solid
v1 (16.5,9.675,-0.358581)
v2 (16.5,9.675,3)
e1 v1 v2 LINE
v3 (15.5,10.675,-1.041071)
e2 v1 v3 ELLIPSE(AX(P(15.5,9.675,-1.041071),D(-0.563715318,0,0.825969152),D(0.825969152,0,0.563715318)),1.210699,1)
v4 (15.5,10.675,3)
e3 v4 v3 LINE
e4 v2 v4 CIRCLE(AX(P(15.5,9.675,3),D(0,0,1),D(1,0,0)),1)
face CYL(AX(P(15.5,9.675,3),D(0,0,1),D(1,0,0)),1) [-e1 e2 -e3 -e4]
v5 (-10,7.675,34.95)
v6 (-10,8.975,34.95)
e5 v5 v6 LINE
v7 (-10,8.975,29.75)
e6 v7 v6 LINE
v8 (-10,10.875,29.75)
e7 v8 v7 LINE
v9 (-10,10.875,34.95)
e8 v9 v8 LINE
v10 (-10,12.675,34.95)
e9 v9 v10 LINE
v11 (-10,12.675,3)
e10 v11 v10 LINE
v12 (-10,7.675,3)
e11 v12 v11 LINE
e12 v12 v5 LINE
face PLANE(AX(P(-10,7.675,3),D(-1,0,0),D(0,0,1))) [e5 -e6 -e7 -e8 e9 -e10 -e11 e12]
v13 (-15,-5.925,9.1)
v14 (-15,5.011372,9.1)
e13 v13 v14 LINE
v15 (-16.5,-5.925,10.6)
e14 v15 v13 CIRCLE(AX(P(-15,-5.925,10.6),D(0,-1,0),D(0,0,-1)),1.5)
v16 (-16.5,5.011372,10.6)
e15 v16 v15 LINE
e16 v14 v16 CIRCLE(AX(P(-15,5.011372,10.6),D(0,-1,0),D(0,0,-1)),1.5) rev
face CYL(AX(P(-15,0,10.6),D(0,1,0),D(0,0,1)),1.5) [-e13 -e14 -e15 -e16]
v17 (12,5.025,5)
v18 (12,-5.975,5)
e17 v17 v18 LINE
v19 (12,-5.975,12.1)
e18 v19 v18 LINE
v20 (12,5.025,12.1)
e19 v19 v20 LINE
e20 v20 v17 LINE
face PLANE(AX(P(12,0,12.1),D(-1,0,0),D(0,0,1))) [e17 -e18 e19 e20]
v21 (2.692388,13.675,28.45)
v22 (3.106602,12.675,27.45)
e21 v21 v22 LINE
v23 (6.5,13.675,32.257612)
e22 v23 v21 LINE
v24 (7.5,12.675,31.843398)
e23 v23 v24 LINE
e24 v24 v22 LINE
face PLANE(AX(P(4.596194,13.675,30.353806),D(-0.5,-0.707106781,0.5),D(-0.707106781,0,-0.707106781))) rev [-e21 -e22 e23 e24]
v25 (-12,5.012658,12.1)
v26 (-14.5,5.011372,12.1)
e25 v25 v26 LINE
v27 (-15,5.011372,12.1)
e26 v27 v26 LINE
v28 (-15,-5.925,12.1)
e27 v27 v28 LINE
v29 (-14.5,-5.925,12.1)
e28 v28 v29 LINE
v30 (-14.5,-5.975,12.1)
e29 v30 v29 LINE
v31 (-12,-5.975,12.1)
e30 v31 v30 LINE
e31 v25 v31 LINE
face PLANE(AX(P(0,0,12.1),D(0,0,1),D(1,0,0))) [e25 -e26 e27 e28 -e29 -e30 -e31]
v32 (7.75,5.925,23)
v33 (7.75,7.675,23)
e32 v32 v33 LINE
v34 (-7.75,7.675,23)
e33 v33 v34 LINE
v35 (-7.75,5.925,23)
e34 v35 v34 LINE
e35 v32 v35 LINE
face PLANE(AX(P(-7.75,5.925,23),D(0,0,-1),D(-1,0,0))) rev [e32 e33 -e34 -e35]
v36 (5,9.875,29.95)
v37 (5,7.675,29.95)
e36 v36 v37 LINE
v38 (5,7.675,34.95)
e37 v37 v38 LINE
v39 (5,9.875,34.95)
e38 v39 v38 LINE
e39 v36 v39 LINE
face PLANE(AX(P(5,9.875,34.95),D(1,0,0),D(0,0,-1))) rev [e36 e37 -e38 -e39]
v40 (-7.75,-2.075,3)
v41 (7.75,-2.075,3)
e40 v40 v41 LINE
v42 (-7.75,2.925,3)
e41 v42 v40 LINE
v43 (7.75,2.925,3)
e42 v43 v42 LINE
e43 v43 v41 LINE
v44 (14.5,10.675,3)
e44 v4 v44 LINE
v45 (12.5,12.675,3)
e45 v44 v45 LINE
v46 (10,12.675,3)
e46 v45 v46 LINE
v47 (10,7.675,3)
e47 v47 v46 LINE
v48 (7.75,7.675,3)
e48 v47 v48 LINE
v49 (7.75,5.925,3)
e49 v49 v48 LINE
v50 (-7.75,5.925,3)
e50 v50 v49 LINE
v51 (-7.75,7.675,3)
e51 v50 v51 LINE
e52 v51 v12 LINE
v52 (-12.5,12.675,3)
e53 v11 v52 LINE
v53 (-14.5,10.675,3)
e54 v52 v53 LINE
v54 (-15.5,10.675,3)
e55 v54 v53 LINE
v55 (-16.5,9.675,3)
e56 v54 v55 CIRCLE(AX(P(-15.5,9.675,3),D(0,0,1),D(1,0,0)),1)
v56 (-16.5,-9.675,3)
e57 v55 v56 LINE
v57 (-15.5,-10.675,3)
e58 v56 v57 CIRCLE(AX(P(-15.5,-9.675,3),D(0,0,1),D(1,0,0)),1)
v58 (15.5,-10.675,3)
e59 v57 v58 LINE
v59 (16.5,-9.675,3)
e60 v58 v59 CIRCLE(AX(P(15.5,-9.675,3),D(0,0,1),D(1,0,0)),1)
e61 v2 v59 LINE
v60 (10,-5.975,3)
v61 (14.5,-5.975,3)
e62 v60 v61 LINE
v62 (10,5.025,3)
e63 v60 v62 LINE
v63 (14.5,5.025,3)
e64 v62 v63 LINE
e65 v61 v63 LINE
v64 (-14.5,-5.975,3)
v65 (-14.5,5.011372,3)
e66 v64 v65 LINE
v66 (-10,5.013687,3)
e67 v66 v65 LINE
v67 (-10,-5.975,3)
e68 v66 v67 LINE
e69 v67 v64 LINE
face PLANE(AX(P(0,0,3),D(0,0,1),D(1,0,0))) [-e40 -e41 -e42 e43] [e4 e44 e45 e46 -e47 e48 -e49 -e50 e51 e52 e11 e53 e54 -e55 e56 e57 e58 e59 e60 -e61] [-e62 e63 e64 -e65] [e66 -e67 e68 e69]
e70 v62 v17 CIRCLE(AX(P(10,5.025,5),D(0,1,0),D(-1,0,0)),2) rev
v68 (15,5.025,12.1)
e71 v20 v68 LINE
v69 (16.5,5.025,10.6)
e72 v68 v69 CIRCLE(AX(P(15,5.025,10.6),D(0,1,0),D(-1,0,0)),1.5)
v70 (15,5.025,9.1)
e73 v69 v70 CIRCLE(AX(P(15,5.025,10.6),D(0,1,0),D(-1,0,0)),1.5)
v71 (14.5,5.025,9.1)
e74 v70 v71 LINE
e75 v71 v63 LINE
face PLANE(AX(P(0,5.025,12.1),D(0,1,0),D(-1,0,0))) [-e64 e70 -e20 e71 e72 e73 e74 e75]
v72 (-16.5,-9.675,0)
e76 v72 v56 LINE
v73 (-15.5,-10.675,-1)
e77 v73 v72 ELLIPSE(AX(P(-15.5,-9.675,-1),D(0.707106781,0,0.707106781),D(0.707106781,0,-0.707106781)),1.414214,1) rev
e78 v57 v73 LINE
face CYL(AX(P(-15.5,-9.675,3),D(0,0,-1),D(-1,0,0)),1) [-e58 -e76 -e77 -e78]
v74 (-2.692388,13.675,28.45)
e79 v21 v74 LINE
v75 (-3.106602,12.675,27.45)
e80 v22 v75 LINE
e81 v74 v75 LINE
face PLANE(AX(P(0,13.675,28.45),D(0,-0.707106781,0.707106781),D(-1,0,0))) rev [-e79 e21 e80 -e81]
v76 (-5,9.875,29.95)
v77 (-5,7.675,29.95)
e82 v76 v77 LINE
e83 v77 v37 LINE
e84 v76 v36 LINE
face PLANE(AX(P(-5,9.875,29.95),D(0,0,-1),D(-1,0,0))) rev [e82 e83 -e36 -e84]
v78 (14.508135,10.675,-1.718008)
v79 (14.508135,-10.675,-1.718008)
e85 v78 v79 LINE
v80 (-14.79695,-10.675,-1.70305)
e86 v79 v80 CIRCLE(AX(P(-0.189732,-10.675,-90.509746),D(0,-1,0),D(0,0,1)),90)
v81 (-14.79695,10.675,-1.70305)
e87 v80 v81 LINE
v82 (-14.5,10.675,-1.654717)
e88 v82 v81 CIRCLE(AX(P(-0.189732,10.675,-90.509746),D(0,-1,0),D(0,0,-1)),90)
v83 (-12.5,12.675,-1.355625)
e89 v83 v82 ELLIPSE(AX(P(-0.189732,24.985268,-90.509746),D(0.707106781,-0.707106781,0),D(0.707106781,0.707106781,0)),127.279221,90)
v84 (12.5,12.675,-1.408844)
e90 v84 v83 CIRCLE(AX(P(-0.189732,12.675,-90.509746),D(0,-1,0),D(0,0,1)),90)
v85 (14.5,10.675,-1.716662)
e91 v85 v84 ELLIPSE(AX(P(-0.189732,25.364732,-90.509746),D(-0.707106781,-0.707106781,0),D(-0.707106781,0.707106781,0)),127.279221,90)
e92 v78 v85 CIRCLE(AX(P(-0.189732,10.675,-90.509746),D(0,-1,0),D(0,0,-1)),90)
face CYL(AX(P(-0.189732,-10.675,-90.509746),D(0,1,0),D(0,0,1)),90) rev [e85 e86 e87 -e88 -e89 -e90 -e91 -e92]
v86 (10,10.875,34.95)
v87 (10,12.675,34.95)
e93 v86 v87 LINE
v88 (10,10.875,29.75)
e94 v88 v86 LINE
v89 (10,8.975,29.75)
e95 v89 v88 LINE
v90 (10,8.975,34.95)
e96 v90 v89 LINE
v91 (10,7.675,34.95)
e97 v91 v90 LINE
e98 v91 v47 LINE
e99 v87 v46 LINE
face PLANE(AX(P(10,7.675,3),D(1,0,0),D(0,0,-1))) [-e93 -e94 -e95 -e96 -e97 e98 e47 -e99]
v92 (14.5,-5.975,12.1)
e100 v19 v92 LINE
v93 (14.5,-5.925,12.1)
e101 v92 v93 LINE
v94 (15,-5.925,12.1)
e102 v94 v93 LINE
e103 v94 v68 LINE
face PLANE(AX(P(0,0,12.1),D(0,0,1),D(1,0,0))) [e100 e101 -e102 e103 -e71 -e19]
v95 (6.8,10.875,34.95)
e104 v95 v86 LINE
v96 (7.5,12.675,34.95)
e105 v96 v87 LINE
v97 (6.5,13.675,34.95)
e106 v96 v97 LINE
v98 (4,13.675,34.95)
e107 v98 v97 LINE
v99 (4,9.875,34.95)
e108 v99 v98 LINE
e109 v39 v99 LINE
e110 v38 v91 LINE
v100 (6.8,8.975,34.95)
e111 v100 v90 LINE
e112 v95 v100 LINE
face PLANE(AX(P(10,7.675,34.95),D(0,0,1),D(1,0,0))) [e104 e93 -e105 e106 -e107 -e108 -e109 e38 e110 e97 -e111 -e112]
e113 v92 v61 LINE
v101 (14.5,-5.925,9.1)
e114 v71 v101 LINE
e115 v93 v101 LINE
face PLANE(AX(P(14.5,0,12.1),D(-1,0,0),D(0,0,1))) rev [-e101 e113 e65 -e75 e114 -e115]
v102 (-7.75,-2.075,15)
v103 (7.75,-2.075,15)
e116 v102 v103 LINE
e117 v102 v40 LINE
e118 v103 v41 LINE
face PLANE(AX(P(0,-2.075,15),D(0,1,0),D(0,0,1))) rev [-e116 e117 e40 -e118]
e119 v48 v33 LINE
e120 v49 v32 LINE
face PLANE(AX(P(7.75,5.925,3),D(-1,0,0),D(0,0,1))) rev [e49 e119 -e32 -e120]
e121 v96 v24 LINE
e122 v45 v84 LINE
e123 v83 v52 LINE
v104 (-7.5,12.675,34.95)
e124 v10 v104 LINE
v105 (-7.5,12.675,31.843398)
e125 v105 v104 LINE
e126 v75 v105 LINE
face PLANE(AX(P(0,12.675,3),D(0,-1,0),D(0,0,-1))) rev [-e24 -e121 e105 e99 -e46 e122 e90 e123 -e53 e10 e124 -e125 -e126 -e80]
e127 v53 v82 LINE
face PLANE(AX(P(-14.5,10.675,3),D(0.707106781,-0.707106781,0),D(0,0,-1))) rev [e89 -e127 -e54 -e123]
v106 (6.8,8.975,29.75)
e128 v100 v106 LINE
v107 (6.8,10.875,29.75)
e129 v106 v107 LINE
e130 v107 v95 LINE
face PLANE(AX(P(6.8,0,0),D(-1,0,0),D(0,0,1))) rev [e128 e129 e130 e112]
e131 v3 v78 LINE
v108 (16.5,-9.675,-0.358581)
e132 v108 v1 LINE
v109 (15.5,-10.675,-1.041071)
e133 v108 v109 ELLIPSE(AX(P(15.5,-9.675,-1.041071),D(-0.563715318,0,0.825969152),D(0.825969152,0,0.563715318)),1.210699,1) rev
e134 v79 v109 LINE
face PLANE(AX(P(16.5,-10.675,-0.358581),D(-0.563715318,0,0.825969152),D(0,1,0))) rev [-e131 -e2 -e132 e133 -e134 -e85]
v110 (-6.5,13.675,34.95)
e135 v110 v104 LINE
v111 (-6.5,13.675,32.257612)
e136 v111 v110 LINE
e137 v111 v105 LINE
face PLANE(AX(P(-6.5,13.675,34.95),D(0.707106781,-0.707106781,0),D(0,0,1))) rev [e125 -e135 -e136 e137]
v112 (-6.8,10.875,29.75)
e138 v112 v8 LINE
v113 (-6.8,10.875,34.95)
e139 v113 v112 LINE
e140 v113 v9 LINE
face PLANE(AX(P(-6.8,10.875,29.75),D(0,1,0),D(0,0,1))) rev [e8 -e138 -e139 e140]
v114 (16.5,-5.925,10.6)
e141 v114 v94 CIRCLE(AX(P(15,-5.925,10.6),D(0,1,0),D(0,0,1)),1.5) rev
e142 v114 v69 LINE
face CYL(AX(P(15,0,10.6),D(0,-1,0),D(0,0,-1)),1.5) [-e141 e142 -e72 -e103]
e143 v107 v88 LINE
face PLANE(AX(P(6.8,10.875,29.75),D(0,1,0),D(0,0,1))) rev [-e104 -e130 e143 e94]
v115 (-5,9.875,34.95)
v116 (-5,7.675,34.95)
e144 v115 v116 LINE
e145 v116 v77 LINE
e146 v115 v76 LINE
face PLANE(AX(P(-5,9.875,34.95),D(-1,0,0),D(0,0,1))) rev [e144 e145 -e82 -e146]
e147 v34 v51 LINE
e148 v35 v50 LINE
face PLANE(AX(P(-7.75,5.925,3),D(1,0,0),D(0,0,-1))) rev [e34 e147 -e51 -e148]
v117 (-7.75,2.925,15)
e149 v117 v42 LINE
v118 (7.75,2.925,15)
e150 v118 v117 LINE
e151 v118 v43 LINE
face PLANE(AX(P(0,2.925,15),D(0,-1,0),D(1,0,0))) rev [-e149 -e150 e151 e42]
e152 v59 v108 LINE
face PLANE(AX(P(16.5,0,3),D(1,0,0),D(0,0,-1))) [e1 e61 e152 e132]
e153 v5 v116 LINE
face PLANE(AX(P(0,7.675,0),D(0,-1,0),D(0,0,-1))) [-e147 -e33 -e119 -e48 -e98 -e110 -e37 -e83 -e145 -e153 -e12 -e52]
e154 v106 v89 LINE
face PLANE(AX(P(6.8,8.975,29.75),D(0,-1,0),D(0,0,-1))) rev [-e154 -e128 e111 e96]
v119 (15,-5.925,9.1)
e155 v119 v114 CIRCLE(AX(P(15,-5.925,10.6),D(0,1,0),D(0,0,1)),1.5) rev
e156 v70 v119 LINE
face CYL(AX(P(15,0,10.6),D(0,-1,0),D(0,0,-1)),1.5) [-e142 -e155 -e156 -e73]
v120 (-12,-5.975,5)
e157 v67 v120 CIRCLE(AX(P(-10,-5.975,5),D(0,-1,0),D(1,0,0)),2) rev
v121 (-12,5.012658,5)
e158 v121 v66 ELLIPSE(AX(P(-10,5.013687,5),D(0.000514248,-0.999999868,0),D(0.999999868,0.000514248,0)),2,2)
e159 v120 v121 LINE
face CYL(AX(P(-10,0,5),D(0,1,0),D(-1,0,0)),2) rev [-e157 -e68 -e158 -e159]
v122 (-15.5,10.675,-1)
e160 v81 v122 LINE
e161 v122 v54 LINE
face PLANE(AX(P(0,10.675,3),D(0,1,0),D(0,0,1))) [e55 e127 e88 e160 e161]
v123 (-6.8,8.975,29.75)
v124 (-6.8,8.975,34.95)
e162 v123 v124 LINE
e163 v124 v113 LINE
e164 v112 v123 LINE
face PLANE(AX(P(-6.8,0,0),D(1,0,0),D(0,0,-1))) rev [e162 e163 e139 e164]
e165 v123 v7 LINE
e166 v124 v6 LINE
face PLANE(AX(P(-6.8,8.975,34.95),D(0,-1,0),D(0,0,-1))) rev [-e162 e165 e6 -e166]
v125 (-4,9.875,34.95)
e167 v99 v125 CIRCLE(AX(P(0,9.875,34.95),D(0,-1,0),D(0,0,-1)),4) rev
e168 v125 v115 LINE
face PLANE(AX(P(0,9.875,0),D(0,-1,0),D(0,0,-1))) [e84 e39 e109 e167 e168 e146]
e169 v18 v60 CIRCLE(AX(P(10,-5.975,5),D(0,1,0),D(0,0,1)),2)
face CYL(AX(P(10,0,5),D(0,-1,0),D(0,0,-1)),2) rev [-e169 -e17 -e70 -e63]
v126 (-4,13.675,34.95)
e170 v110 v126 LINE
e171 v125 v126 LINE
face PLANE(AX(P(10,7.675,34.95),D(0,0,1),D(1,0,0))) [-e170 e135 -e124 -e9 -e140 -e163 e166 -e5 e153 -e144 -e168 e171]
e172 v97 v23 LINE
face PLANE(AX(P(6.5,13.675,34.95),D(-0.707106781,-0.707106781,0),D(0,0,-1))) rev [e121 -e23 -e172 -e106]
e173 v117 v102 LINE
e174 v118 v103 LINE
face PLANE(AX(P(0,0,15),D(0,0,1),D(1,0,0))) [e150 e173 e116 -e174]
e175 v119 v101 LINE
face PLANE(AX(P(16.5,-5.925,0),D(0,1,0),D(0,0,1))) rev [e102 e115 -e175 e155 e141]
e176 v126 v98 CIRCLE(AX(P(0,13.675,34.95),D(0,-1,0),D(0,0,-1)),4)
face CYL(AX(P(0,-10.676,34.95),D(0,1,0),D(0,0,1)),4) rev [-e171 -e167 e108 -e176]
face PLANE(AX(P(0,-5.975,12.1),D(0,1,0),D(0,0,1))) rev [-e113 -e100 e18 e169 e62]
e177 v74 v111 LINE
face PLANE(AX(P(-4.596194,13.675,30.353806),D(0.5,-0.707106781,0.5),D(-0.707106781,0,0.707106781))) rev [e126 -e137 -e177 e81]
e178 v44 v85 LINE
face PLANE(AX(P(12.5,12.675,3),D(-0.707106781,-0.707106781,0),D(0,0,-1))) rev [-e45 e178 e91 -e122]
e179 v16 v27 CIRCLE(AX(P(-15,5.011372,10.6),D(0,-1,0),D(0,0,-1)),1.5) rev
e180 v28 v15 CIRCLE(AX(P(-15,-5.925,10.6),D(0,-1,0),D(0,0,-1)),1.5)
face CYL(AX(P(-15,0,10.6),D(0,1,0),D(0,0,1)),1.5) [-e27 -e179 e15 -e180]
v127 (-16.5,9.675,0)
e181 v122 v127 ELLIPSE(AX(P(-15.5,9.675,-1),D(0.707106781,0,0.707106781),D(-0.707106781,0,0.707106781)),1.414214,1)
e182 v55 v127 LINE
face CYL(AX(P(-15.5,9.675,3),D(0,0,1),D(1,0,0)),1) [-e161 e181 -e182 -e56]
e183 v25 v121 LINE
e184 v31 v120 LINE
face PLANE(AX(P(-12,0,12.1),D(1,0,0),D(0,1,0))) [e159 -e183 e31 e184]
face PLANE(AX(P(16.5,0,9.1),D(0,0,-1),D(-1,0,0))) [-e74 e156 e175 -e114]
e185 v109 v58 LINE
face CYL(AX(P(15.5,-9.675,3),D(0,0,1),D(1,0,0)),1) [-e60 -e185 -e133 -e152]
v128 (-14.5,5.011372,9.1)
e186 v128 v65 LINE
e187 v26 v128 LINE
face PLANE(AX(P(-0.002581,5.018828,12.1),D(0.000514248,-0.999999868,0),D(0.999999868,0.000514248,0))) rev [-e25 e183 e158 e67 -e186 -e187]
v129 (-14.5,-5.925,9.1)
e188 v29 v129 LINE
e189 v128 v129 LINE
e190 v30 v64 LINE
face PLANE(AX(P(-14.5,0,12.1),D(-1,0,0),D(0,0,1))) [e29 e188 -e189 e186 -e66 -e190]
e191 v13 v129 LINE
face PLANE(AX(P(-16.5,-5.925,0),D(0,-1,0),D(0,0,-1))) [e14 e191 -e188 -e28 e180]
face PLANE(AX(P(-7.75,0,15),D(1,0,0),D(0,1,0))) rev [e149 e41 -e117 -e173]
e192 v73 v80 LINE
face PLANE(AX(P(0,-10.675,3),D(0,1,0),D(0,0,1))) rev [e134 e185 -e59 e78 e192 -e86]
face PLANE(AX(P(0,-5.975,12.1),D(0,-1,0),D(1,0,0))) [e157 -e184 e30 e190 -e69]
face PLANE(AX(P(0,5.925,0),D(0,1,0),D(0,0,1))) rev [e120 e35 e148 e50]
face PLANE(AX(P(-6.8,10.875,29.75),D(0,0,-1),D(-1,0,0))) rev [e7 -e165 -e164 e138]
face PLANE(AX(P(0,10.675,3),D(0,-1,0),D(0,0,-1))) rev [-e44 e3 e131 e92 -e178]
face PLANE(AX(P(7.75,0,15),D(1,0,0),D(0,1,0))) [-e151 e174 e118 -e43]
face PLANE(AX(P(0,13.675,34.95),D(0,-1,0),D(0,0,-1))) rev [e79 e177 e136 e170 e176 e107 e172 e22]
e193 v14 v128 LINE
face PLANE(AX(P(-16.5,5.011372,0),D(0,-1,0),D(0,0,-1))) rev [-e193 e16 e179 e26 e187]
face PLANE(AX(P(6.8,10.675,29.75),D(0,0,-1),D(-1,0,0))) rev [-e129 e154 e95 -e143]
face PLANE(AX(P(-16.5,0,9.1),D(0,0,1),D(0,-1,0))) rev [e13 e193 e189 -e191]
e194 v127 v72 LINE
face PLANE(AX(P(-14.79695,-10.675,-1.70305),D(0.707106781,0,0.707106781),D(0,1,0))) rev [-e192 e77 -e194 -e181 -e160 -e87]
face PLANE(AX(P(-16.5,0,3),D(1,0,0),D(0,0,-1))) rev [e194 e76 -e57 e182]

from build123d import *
from build123d.topology import SkipClean

# Parameters (mm, degrees)
BOSS_EXTRUDE1_DEPTH = 3
SKETCH2_W           = 2.5
SKETCH2_H           = 11
BOSS_EXTRUDE2_DEPTH = 9.1
SKETCH3_W           = 3
SKETCH3_H           = 10.936372413
BOSS_EXTRUDE3_DEPTH = 2
SKETCH4_W           = 3
SKETCH4_H           = 10.95
BOSS_EXTRUDE4_DEPTH = 2
FILLET2_R           = 1.5
FILLET3_R           = 2
SKETCH6_W           = 20
SKETCH6_H           = 31.95
BOSS_EXTRUDE5_DEPTH = 5
CUT_EXTRUDE1_REACH  = 47.155
BOSS_EXTRUDE6_START = 1
BOSS_EXTRUDE6_DEPTH = 1
CHAMFER1_SIZE       = 1
SKETCH10_W          = 15.5
SKETCH10_H          = 20
BOSS_EXTRUDE7_DEPTH = 1.75
BOSS_EXTRUDE8_DEPTH = 12
BOSS_EXTRUDE9_DEPTH = 23.35
CHAMFER3_SIZE       = 1.7121869
CHAMFER3_SIZE_2     = 2
FILLET4_R           = 1
CHAMFER4_SIZE       = 2
CUT_EXTRUDE2_DEPTH  = 41.997050199
CUT_EXTRUDE3_DEPTH  = 3.2
SKETCH15_W          = 5.2
SKETCH15_H          = 1.9
CUT_EXTRUDE4_DEPTH  = 3.2
SKETCH16_W          = 10
SKETCH16_H          = 5
CUT_EXTRUDE5_DEPTH  = 2.2


# Some blends are built 0.0001 mm under size
with BuildPart() as part:
    # Sketch1 → Boss-Extrude1 (new body)
    with BuildSketch(Plane.XY):
        Polygon((14.5, 12.675), (-14.5, 12.675), (-14.5, 10.675), (-16.5, 10.675), (-16.5, -10.675), (16.5, -10.675), (16.5, 10.675), (14.5, 10.675), align=None)
    extrude(amount=BOSS_EXTRUDE1_DEPTH)

    # Sketch2 → Boss-Extrude2 (add)
    with BuildSketch(Plane.XY.offset(3)):
        with Locations((13.25, -0.475)):
            Rectangle(SKETCH2_W, SKETCH2_H)
        Polygon((-14.5, 5.011372413), (-14.5, -5.975), (-12, -5.975), (-12, 5.012658035), align=None)
    extrude(amount=BOSS_EXTRUDE2_DEPTH)

    # Sketch3 → Boss-Extrude3 (add)
    with BuildSketch(Plane.ZY.offset(14.5)):
        with Locations((10.6, -0.456813794)):
            Rectangle(SKETCH3_W, SKETCH3_H)
    extrude(amount=BOSS_EXTRUDE3_DEPTH)

    # Sketch4 → Boss-Extrude4 (add)
    with BuildSketch(Plane(origin=(14.5, 0, 0), x_dir=(0, 0, -1), z_dir=(1, 0, 0))):
        with Locations((-10.6, -0.45)):
            Rectangle(SKETCH4_W, SKETCH4_H)
    extrude(amount=BOSS_EXTRUDE4_DEPTH)

    # Fillet2
    fillet2_edges = [part.edges().sort_by_distance(p)[0] for p in [
        (-16.5, -0.456813793, 9.1),
        (-16.5, -0.456813793, 12.1),
        (16.5, -0.45, 9.1),
        (16.5, -0.45, 12.1),
    ]]
    fillet(fillet2_edges, radius=FILLET2_R - 0.0001)  # a hair under: the kernel refuses the full size

    # Fillet3
    fillet3_edges = [part.edges().sort_by_distance(p)[0] for p in [
        (12, -0.475, 3),
        (-12, -0.481170983, 3),
    ]]
    fillet(fillet3_edges, radius=FILLET3_R)

    # Sketch6 → Boss-Extrude5 (add)
    with BuildSketch(Plane(origin=(0, 12.675, 0), x_dir=(1, 0, 0), z_dir=(0, 1, 0))):
        with Locations((0, -18.975)):
            Rectangle(SKETCH6_W, SKETCH6_H)
    extrude(amount=-BOSS_EXTRUDE5_DEPTH)

    # Sketch7 → Cut-Extrude1 (cut, up to next)
    with BuildSketch(Plane(origin=(0, 12.675, 0), x_dir=(1, 0, 0), z_dir=(0, 1, 0)), mode=Mode.PRIVATE) as cut_extrude1_sk1:
        with BuildLine():
            Line((-4, -34.95), (4, -34.95))
            ThreePointArc((4, -34.95), (0, -30.95), (-4, -34.95))
        make_face()
    cut_extrude1_tool1 = extrude(cut_extrude1_sk1.sketch, amount=-CUT_EXTRUDE1_REACH, mode=Mode.PRIVATE) & part.part
    add(cut_extrude1_tool1.solids().sort_by_distance((0, 12.675, 33.252347))[0], mode=Mode.SUBTRACT)

    # Sketch8 → Boss-Extrude6 (add)
    with BuildSketch(Plane(origin=(0, 12.675, 0), x_dir=(1, 0, 0), z_dir=(0, 1, 0)).offset(BOSS_EXTRUDE6_START)):
        with BuildLine():
            Line((-7.5, -34.95), (-4, -34.95))
            ThreePointArc((-4, -34.95), (0, -30.95), (4, -34.95))
            Line((4, -34.95), (7.5, -34.95))
            Line((7.5, -34.95), (7.5, -31.843398282))
            Line((7.5, -31.843398282), (3.106601718, -27.45))
            Line((3.106601718, -27.45), (-3.106601718, -27.45))
            Line((-3.106601718, -27.45), (-7.5, -31.843398282))
            Line((-7.5, -31.843398282), (-7.5, -34.95))
        make_face()
    extrude(amount=-BOSS_EXTRUDE6_DEPTH)

    # Chamfer1
    chamfer1_edges = [part.edges().sort_by_distance(p)[0] for p in [
        (-7.5, 13.675, 33.396699141),
        (-5.303300859, 13.675, 29.646699141),
        (0, 13.675, 27.45),
        (5.303300859, 13.675, 29.646699141),
        (7.5, 13.675, 33.396699141),
    ]]
    chamfer(chamfer1_edges, length=CHAMFER1_SIZE - 0.0001)  # a hair under: the kernel refuses the full size

    # Sketch10 → Boss-Extrude7 (add)
    with BuildSketch(Plane.XZ.offset(-7.675)):
        with Locations((0, 13)):
            Rectangle(SKETCH10_W, SKETCH10_H)
    extrude(amount=BOSS_EXTRUDE7_DEPTH)

    # Sketch11 → Boss-Extrude8 (add)
    with BuildSketch(Plane.XY.offset(3)):
        Polygon((-7.75, 1.425), (-7.75, -2.075), (7.75, -2.075), (7.75, 1.425), (7.75, 2.925), (-7.75, 2.925), align=None)
    extrude(amount=BOSS_EXTRUDE8_DEPTH)

    # Sketch12 → Boss-Extrude9 (add, through all)
    with BuildSketch(Plane(origin=(0, 12.675, 0), x_dir=(1, 0, 0), z_dir=(0, 1, 0))):
        with BuildLine():
            Line((-16.5, 0), (-16.5, 2))
            ThreePointArc((-16.5, 2), (0.003271262, 0.509953036), (16.5, 2.070767971))
            Line((16.5, 2.070767971), (16.5, 0))
            Line((16.5, 0), (-16.5, 0))
        make_face()
    extrude(amount=-BOSS_EXTRUDE9_DEPTH)

    # Chamfer3
    # the kernel refuses this chamfer: 2, 1.717229303, 1.7121869 mm, written as the material it takes off along each edge
    with BuildSketch(Plane(origin=(16.5, 17.877033417, -2.070767971), x_dir=(-0.98467727082698, 0, 0.1743865600232151), z_dir=(0, -1, 0))) as chamfer3_piece_1:
        with BuildLine():
            Line((2.022860888, 0), (CHAMFER3_SIZE * 0.174386559999, -CHAMFER3_SIZE * 0.984677270689))
            Line((CHAMFER3_SIZE * 0.174386559999, -CHAMFER3_SIZE * 0.984677270689), (0, 0))
            ThreePointArc((0, 0), (1.040041486, -0.005678918), (2.022860888, 0))
        make_face()
    extrude(amount=33.754066833, mode=Mode.SUBTRACT)
    with BuildSketch(Plane(origin=(-16.5, 17.818365976, -2), x_dir=(0, 0, 1), z_dir=(0, -1, 0))) as chamfer3_piece_2:
        with BuildLine():
            Line((CHAMFER3_SIZE_2, 0), (0.296949553, -1.703050447))
            ThreePointArc((0.296949553, -1.703050447), (0.156514359, -0.873485517), (0, 0))
            Line((0, 0), (CHAMFER3_SIZE_2, 0))
        make_face()
    extrude(amount=33.636731952, mode=Mode.SUBTRACT)

    # Fillet4
    fillet4_edges = [part.edges().sort_by_distance(p)[0] for p in [
        (16.5, 10.675, 1.5),
        (16.5, -10.675, 1.320709464),
        (-16.5, -10.675, 1.5),
        (-16.5, 10.675, 1.5),
    ]]
    fillet(fillet4_edges, radius=FILLET4_R)

    # Chamfer4
    chamfer4_edges = [part.edges().sort_by_distance(p)[0] for p in [
        (-14.5, 12.675, 1.5),
        (14.5, 12.675, 1.5),
    ]]
    chamfer(chamfer4_edges, length=CHAMFER4_SIZE - 0.0001)  # a hair under: the kernel refuses the full size

    # Sketch13 → Cut-Extrude2 (cut, through all)
    with SkipClean():  # the faces are left unmerged after this step: merging them gives an invalid solid
        with BuildSketch(Plane.XY):
            with BuildLine():
                Line((12.5, 12.675), (16.5, 12.675))
                Line((16.5, 12.675), (16.5, 9.675))
                ThreePointArc((16.5, 9.675), (16.207106781, 10.382106781), (15.5, 10.675))
                Line((15.5, 10.675), (14.5, 10.675))
                Line((14.5, 10.675), (12.5, 12.675))
            make_face()
            with BuildLine():
                Line((-12.5, 12.675), (-16.5, 12.675))
                Line((-16.5, 12.675), (-16.5, 9.675))
                ThreePointArc((-16.5, 9.675), (-16.207106781, 10.382106781), (-15.5, 10.675))
                Line((-15.5, 10.675), (-14.5, 10.675))
                Line((-14.5, 10.675), (-12.5, 12.675))
            make_face()
        extrude(amount=-CUT_EXTRUDE2_DEPTH, mode=Mode.SUBTRACT)

    # Sketch14 → Cut-Extrude3 (cut)
    with SkipClean():  # the faces are left unmerged after this step: merging them gives an invalid solid
        with BuildSketch(Plane(origin=(10, 0, 0), x_dir=(0, 0, -1), z_dir=(1, 0, 0))):
            Polygon((-34.95, 10.875), (-34.95, 8.975), (-29.75, 8.975), (-29.75, 9.175), (-29.75, 10.675), (-29.75, 10.875), align=None)
        extrude(amount=-CUT_EXTRUDE3_DEPTH, mode=Mode.SUBTRACT)

    # Sketch15 → Cut-Extrude4 (cut)
    with SkipClean():  # the faces are left unmerged after this step: merging them gives an invalid solid
        with BuildSketch(Plane.ZY.offset(10)):
            with Locations((32.35, 9.925)):
                Rectangle(SKETCH15_W, SKETCH15_H)
        extrude(amount=-CUT_EXTRUDE4_DEPTH, mode=Mode.SUBTRACT)

    # Sketch16 → Cut-Extrude5 (cut)
    with SkipClean():  # the faces are left unmerged after this step: merging them gives an invalid solid
        with BuildSketch(Plane.XZ.offset(-7.675)):
            with Locations((0, 32.45)):
                Rectangle(SKETCH16_W, SKETCH16_H)
        extrude(amount=-CUT_EXTRUDE5_DEPTH, mode=Mode.SUBTRACT)


solid = part.part
